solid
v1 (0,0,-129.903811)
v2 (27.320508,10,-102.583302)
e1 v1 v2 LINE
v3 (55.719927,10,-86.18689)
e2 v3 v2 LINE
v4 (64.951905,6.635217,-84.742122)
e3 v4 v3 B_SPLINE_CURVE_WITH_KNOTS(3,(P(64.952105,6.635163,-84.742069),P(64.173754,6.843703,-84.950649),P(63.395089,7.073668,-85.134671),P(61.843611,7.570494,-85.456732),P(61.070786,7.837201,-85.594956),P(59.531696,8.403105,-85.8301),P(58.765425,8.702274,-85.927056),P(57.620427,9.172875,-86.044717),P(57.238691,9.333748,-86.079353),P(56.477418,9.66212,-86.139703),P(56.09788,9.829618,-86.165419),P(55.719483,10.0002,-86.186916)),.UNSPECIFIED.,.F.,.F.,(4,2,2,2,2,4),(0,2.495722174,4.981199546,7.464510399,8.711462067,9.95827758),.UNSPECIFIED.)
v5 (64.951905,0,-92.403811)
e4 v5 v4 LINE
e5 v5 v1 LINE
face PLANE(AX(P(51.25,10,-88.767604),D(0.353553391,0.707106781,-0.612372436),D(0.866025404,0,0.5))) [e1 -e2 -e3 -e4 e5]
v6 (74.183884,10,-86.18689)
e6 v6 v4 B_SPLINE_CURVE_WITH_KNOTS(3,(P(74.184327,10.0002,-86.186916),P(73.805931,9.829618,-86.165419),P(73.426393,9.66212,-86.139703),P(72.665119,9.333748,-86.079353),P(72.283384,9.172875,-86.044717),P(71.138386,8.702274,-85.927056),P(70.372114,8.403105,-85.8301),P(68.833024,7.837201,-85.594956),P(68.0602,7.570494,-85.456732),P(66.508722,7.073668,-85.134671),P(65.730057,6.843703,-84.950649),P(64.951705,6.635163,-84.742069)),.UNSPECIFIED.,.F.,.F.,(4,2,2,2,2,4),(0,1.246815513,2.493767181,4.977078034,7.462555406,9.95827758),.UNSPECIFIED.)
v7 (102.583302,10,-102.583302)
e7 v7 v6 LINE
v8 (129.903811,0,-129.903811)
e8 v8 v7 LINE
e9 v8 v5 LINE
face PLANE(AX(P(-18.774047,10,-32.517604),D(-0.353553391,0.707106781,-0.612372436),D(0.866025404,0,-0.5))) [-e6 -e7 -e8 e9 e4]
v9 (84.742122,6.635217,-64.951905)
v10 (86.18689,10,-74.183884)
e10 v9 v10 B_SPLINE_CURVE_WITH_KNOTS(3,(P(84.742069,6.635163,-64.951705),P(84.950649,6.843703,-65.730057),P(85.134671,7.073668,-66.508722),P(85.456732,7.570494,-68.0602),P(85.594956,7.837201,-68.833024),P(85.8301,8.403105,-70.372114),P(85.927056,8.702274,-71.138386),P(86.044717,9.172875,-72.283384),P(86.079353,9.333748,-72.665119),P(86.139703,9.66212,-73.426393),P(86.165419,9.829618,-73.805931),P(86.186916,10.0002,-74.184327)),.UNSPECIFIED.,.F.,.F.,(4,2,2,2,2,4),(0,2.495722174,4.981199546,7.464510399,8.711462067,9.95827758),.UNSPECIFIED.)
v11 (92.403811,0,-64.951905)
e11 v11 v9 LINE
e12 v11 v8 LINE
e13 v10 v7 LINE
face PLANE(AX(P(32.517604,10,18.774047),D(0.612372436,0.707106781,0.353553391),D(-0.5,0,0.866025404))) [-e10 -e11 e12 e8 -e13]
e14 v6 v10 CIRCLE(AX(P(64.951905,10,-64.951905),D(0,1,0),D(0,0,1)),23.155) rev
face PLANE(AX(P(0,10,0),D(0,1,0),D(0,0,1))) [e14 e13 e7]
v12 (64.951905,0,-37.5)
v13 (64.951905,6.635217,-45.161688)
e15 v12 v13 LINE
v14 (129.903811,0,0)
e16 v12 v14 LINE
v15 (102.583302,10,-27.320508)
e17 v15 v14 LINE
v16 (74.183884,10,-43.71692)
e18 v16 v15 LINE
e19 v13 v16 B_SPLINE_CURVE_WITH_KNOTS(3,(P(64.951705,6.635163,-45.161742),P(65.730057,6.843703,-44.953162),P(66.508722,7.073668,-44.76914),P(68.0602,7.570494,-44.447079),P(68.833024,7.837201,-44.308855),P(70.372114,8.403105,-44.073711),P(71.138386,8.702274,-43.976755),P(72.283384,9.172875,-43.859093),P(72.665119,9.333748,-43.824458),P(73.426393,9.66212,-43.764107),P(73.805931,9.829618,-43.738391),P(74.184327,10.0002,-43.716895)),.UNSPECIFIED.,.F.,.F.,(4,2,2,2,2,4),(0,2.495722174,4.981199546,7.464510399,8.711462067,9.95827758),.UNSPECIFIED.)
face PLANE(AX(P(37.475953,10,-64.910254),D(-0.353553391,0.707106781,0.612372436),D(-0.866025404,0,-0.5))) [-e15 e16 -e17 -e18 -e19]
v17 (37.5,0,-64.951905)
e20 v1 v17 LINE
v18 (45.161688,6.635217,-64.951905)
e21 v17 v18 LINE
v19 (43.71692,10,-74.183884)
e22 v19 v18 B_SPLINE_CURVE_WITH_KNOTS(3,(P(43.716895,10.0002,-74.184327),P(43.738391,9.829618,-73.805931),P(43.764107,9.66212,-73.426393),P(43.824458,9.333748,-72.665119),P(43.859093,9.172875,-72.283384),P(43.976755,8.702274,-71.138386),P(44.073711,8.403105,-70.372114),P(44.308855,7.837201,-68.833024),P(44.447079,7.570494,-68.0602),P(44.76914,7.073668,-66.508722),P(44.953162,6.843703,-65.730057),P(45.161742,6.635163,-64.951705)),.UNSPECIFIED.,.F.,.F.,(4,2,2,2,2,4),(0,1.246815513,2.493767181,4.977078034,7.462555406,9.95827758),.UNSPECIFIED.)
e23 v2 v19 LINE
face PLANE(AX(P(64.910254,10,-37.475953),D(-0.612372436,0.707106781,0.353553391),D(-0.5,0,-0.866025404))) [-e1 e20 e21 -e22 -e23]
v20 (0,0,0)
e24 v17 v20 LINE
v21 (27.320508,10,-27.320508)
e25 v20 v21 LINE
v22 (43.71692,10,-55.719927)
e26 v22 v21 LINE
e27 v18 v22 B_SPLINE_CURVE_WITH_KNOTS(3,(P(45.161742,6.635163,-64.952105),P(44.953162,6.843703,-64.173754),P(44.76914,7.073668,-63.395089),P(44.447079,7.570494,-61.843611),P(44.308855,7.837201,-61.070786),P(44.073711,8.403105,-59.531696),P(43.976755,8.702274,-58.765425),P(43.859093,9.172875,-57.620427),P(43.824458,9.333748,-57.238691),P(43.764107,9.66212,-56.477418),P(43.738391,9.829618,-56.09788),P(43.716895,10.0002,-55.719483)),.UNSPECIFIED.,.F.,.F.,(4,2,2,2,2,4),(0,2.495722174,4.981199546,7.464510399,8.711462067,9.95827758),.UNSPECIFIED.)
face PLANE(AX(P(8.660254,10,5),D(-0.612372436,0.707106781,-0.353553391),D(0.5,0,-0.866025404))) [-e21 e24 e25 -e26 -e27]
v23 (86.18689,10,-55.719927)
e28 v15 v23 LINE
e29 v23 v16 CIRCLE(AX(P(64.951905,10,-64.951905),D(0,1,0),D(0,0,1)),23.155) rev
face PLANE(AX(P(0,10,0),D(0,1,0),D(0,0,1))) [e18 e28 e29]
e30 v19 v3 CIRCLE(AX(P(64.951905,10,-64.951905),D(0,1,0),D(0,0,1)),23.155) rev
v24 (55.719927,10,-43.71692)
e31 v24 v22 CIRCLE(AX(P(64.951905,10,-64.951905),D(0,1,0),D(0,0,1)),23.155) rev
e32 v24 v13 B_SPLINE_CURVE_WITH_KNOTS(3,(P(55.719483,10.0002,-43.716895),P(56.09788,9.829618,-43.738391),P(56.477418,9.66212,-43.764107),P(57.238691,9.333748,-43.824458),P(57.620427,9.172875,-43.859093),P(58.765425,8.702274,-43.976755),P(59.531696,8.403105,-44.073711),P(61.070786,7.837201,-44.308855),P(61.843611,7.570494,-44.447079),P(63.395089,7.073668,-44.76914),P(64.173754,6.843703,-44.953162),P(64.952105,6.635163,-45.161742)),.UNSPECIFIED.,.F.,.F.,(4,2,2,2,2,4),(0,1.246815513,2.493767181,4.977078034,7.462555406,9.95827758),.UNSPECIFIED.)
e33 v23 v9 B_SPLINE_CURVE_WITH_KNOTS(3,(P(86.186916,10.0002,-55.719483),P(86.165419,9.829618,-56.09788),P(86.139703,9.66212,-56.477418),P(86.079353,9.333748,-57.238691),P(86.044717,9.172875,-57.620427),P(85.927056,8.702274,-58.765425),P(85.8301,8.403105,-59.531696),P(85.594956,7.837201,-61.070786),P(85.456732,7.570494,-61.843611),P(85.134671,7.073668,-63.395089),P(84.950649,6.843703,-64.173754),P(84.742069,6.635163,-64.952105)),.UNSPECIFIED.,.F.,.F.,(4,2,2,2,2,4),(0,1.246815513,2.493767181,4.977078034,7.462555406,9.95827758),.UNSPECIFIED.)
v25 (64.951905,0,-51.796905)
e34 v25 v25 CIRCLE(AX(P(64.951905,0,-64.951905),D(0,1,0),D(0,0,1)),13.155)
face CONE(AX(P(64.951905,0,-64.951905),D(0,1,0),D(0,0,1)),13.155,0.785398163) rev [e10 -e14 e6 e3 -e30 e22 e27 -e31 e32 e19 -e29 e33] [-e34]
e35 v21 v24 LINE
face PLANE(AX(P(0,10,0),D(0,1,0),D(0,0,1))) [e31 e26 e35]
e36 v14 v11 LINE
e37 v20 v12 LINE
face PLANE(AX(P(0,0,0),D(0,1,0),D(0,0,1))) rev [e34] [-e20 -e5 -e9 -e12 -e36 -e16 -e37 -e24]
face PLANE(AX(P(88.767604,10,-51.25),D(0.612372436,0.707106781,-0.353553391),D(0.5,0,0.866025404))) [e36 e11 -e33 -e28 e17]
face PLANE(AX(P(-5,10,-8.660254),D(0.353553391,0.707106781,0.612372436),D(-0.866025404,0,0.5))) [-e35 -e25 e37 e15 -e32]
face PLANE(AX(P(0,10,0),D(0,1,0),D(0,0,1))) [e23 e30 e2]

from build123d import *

# Parameters (mm, degrees)
SKETCH1_R           = 13.155
BOSS_EXTRUDE1_DEPTH = 10
CHAMFER4_SIZE       = 10


with BuildPart() as part:
    # Sketch1 → Boss-Extrude1 (new body)
    with BuildSketch(Plane(origin=(0, 0, 0), x_dir=(1, 0, 0), z_dir=(0, 1, 0))):
        Polygon((0, 0), (37.5, 64.951905284), (0, 129.903810568), (64.951905284, 92.403810568), (129.903810568, 129.903810568), (92.403810568, 64.951905284), (129.903810568, 0), (64.951905284, 37.5), align=None)
        with Locations(Location((64.951905284, 64.951905284, 0), (0, 0, 270))):
            Circle(SKETCH1_R, mode=Mode.SUBTRACT)
    extrude(amount=BOSS_EXTRUDE1_DEPTH)

    # Chamfer4
    # the kernel refuses this chamfer: 10 mm, written as the material it takes off along each edge
    with BuildSketch(Plane(origin=(64.951905284, 10, -64.951905284), x_dir=(0, 0, 1), z_dir=(-1, 0, 0))) as chamfer4_piece_1:
        Polygon((13.155, -CHAMFER4_SIZE), (13.155 + CHAMFER4_SIZE, 0), (13.155, 0), align=None)
    revolve(axis=Axis((64.951905284, 10, -64.951905284), (0, 1, 0)), mode=Mode.SUBTRACT)
    with BuildSketch(Plane(origin=(-12.85841494, 10, 22.271427981), x_dir=(-0.023812127644090117, -0.9996219169112968, -0.013747938305293196), z_dir=(0.5000000000000011, 0, -0.866025403784438))) as chamfer4_piece_2_section:
        Polygon((CHAMFER4_SIZE * 0.999621916911, -CHAMFER4_SIZE * 0.0274958766106), (-CHAMFER4_SIZE * 0.0274958766106, -CHAMFER4_SIZE * 0.999621916911), (0, 0), align=None)
    chamfer4_piece_2 = extrude(amount=126.433659759, mode=Mode.PRIVATE)
    chamfer4_piece_2 = split(chamfer4_piece_2, bisect_by=Plane(origin=(51.736915966, 6.682227924, -40.292843487), z_dir=(-0.8660254037844383, 0, 0.5000000000000009)), keep=Keep.TOP, mode=Mode.PRIVATE)
    add(chamfer4_piece_2, mode=Mode.SUBTRACT)
    with BuildSketch(Plane(origin=(50.35841494, 10, -42.680477303), x_dir=(-0.02381212764408977, -0.9996219169112968, 0.013747938305292988), z_dir=(-0.5000000000000009, 0, -0.8660254037844383))) as chamfer4_piece_3_section:
        Polygon((CHAMFER4_SIZE * 0.999621916911, -CHAMFER4_SIZE * 0.0274958766106), (-CHAMFER4_SIZE * 0.0274958766106, -CHAMFER4_SIZE * 0.999621916911), (0, 0), align=None)
    chamfer4_piece_3 = extrude(amount=126.433659759, mode=Mode.PRIVATE)
    chamfer4_piece_3 = split(chamfer4_piece_3, bisect_by=Plane(origin=(51.736915966, 6.682227924, -89.610967081), z_dir=(-0.866025403784438, 0, -0.5000000000000011)), keep=Keep.TOP, mode=Mode.PRIVATE)
    add(chamfer4_piece_3, mode=Mode.SUBTRACT)
    with BuildSketch(Plane(origin=(-22.271427981, 10, -142.762225507), x_dir=(0.01374793830529321, -0.9996219169112968, -0.023812127644090134), z_dir=(0.866025403784438, 0, 0.5000000000000012))) as chamfer4_piece_4_section:
        Polygon((CHAMFER4_SIZE * 0.999621916911, -CHAMFER4_SIZE * 0.0274958766106), (-CHAMFER4_SIZE * 0.0274958766106, -CHAMFER4_SIZE * 0.999621916911), (0, 0), align=None)
    chamfer4_piece_4 = extrude(amount=126.433659759, mode=Mode.PRIVATE)
    chamfer4_piece_4 = split(chamfer4_piece_4, bisect_by=Plane(origin=(40.292843487, 6.682227924, -78.166894601), z_dir=(-0.5000000000000012, 0, -0.866025403784438)), keep=Keep.TOP, mode=Mode.PRIVATE)
    add(chamfer4_piece_4, mode=Mode.SUBTRACT)
    with BuildSketch(Plane(origin=(42.680477303, 10, -79.545395628), x_dir=(-0.01374793830529287, -0.9996219169112968, -0.023812127644089548), z_dir=(0.866025403784438, 0, -0.5000000000000012))) as chamfer4_piece_5_section:
        Polygon((CHAMFER4_SIZE * 0.999621916911, -CHAMFER4_SIZE * 0.0274958766106), (-CHAMFER4_SIZE * 0.0274958766106, -CHAMFER4_SIZE * 0.999621916911), (0, 0), align=None)
    chamfer4_piece_5 = extrude(amount=126.433659759, mode=Mode.PRIVATE)
    chamfer4_piece_5 = split(chamfer4_piece_5, bisect_by=Plane(origin=(89.610967081, 6.682227924, -78.166894601), z_dir=(0.5000000000000012, 0, -0.866025403784438)), keep=Keep.TOP, mode=Mode.PRIVATE)
    add(chamfer4_piece_5, mode=Mode.SUBTRACT)
    with BuildSketch(Plane(origin=(142.762225507, 10, -152.175238548), x_dir=(0.023812127644092358, -0.9996219169112965, 0.013747938305294477), z_dir=(-0.5000000000000007, 0, 0.8660254037844384))) as chamfer4_piece_6_section:
        Polygon((CHAMFER4_SIZE * 0.999621916911, -CHAMFER4_SIZE * 0.0274958766106), (-CHAMFER4_SIZE * 0.0274958766106, -CHAMFER4_SIZE * 0.999621916911), (0, 0), align=None)
    chamfer4_piece_6 = extrude(amount=126.433659759, mode=Mode.PRIVATE)
    chamfer4_piece_6 = split(chamfer4_piece_6, bisect_by=Plane(origin=(78.166894601, 6.682227924, -89.610967081), z_dir=(0.8660254037844382, 0, -0.500000000000001)), keep=Keep.TOP, mode=Mode.PRIVATE)
    add(chamfer4_piece_6, mode=Mode.SUBTRACT)
    with BuildSketch(Plane(origin=(79.545395628, 10, -87.223333264), x_dir=(0.023812127644090287, -0.9996219169112968, -0.013747938305293292), z_dir=(0.500000000000001, 0, 0.8660254037844382))) as chamfer4_piece_7_section:
        Polygon((CHAMFER4_SIZE * 0.999621916911, -CHAMFER4_SIZE * 0.0274958766106), (-CHAMFER4_SIZE * 0.0274958766106, -CHAMFER4_SIZE * 0.999621916911), (0, 0), align=None)
    chamfer4_piece_7 = extrude(amount=126.433659759, mode=Mode.PRIVATE)
    chamfer4_piece_7 = split(chamfer4_piece_7, bisect_by=Plane(origin=(78.166894601, 6.682227924, -40.292843487), z_dir=(0.8660254037844384, 0, 0.5000000000000007)), keep=Keep.TOP, mode=Mode.PRIVATE)
    add(chamfer4_piece_7, mode=Mode.SUBTRACT)
    with BuildSketch(Plane(origin=(152.175238548, 10, 12.85841494), x_dir=(-0.013747938305293, -0.9996219169112968, 0.023812127644089767), z_dir=(-0.8660254037844379, 0, -0.5000000000000012))) as chamfer4_piece_8_section:
        Polygon((CHAMFER4_SIZE * 0.999621916911, -CHAMFER4_SIZE * 0.0274958766106), (-CHAMFER4_SIZE * 0.0274958766106, -CHAMFER4_SIZE * 0.999621916911), (0, 0), align=None)
    chamfer4_piece_8 = extrude(amount=126.433659759, mode=Mode.PRIVATE)
    chamfer4_piece_8 = split(chamfer4_piece_8, bisect_by=Plane(origin=(89.610967081, 6.682227924, -51.736915966), z_dir=(0.5000000000000012, 0, 0.8660254037844379)), keep=Keep.TOP, mode=Mode.PRIVATE)
    add(chamfer4_piece_8, mode=Mode.SUBTRACT)
    with BuildSketch(Plane(origin=(87.223333264, 10, -50.35841494), x_dir=(0.013747938305293599, -0.9996219169112968, 0.0238121276440908), z_dir=(-0.8660254037844379, 0, 0.5000000000000012))) as chamfer4_piece_9_section:
        Polygon((CHAMFER4_SIZE * 0.999621916911, -CHAMFER4_SIZE * 0.0274958766106), (-CHAMFER4_SIZE * 0.0274958766106, -CHAMFER4_SIZE * 0.999621916911), (0, 0), align=None)
    chamfer4_piece_9 = extrude(amount=126.433659759, mode=Mode.PRIVATE)
    chamfer4_piece_9 = split(chamfer4_piece_9, bisect_by=Plane(origin=(40.292843487, 6.682227924, -51.736915966), z_dir=(-0.5000000000000012, 0, 0.8660254037844379)), keep=Keep.TOP, mode=Mode.PRIVATE)
    add(chamfer4_piece_9, mode=Mode.SUBTRACT)
    with BuildSketch(Plane(origin=(-12.85841494, 10, 22.271427981), x_dir=(-0.023812127644090117, -0.9996219169112968, -0.013747938305293196), z_dir=(0.5000000000000011, 0, -0.866025403784438))) as chamfer4_piece_10a_section:
        Polygon((CHAMFER4_SIZE * 0.999621916911, -CHAMFER4_SIZE * 0.0274958766106), (-CHAMFER4_SIZE * 0.0274958766106, -CHAMFER4_SIZE * 0.999621916911), (0, 0), align=None)
    chamfer4_piece_10a = extrude(amount=126.433659759, mode=Mode.PRIVATE)
    chamfer4_piece_10a = split(chamfer4_piece_10a, bisect_by=Plane(origin=(36.018509, 6.773025627, -67.517922967), z_dir=(0.8660254037844383, 0, -0.5000000000000009)), keep=Keep.TOP, mode=Mode.PRIVATE)
    with BuildSketch(Plane(origin=(50.35841494, 10, -42.680477303), x_dir=(-0.02381212764408977, -0.9996219169112968, 0.013747938305292988), z_dir=(-0.5000000000000009, 0, -0.8660254037844383))) as chamfer4_piece_10b_section:
        Polygon((CHAMFER4_SIZE * 0.999621916911, -CHAMFER4_SIZE * 0.0274958766106), (-CHAMFER4_SIZE * 0.0274958766106, -CHAMFER4_SIZE * 0.999621916911), (0, 0), align=None)
    chamfer4_piece_10b = extrude(amount=126.433659759, mode=Mode.PRIVATE)
    chamfer4_piece_10b = split(chamfer4_piece_10b, bisect_by=Plane(origin=(36.018509, 6.773025627, -62.385887601), z_dir=(0.866025403784438, 0, 0.5000000000000011)), keep=Keep.TOP, mode=Mode.PRIVATE)
    chamfer4_piece_10 = chamfer4_piece_10a & chamfer4_piece_10b
    add(chamfer4_piece_10, mode=Mode.SUBTRACT)
    with BuildSketch(Plane(origin=(-22.271427981, 10, -142.762225507), x_dir=(0.01374793830529321, -0.9996219169112968, -0.023812127644090134), z_dir=(0.866025403784438, 0, 0.5000000000000012))) as chamfer4_piece_11a_section:
        Polygon((CHAMFER4_SIZE * 0.999621916911, -CHAMFER4_SIZE * 0.0274958766106), (-CHAMFER4_SIZE * 0.0274958766106, -CHAMFER4_SIZE * 0.999621916911), (0, 0), align=None)
    chamfer4_piece_11a = extrude(amount=126.433659759, mode=Mode.PRIVATE)
    chamfer4_piece_11a = split(chamfer4_piece_11a, bisect_by=Plane(origin=(67.517922967, 6.773025627, -93.885301568), z_dir=(0.5000000000000012, 0, 0.866025403784438)), keep=Keep.TOP, mode=Mode.PRIVATE)
    with BuildSketch(Plane(origin=(42.680477303, 10, -79.545395628), x_dir=(-0.01374793830529287, -0.9996219169112968, -0.023812127644089548), z_dir=(0.866025403784438, 0, -0.5000000000000012))) as chamfer4_piece_11b_section:
        Polygon((CHAMFER4_SIZE * 0.999621916911, -CHAMFER4_SIZE * 0.0274958766106), (-CHAMFER4_SIZE * 0.0274958766106, -CHAMFER4_SIZE * 0.999621916911), (0, 0), align=None)
    chamfer4_piece_11b = extrude(amount=126.433659759, mode=Mode.PRIVATE)
    chamfer4_piece_11b = split(chamfer4_piece_11b, bisect_by=Plane(origin=(62.385887601, 6.773025627, -93.885301568), z_dir=(-0.5000000000000012, 0, 0.866025403784438)), keep=Keep.TOP, mode=Mode.PRIVATE)
    chamfer4_piece_11 = chamfer4_piece_11a & chamfer4_piece_11b
    add(chamfer4_piece_11, mode=Mode.SUBTRACT)
    with BuildSketch(Plane(origin=(142.762225507, 10, -152.175238548), x_dir=(0.023812127644092358, -0.9996219169112965, 0.013747938305294477), z_dir=(-0.5000000000000007, 0, 0.8660254037844384))) as chamfer4_piece_12a_section:
        Polygon((CHAMFER4_SIZE * 0.999621916911, -CHAMFER4_SIZE * 0.0274958766106), (-CHAMFER4_SIZE * 0.0274958766106, -CHAMFER4_SIZE * 0.999621916911), (0, 0), align=None)
    chamfer4_piece_12a = extrude(amount=126.433659759, mode=Mode.PRIVATE)
    chamfer4_piece_12a = split(chamfer4_piece_12a, bisect_by=Plane(origin=(93.885301568, 6.773025627, -62.385887601), z_dir=(-0.8660254037844382, 0, 0.500000000000001)), keep=Keep.TOP, mode=Mode.PRIVATE)
    with BuildSketch(Plane(origin=(79.545395628, 10, -87.223333264), x_dir=(0.023812127644090287, -0.9996219169112968, -0.013747938305293292), z_dir=(0.500000000000001, 0, 0.8660254037844382))) as chamfer4_piece_12b_section:
        Polygon((CHAMFER4_SIZE * 0.999621916911, -CHAMFER4_SIZE * 0.0274958766106), (-CHAMFER4_SIZE * 0.0274958766106, -CHAMFER4_SIZE * 0.999621916911), (0, 0), align=None)
    chamfer4_piece_12b = extrude(amount=126.433659759, mode=Mode.PRIVATE)
    chamfer4_piece_12b = split(chamfer4_piece_12b, bisect_by=Plane(origin=(93.885301568, 6.773025627, -67.517922967), z_dir=(-0.8660254037844384, 0, -0.5000000000000007)), keep=Keep.TOP, mode=Mode.PRIVATE)
    chamfer4_piece_12 = chamfer4_piece_12a & chamfer4_piece_12b
    add(chamfer4_piece_12, mode=Mode.SUBTRACT)
    with BuildSketch(Plane(origin=(152.175238548, 10, 12.85841494), x_dir=(-0.013747938305293, -0.9996219169112968, 0.023812127644089767), z_dir=(-0.8660254037844379, 0, -0.5000000000000012))) as chamfer4_piece_13a_section:
        Polygon((CHAMFER4_SIZE * 0.999621916911, -CHAMFER4_SIZE * 0.0274958766106), (-CHAMFER4_SIZE * 0.0274958766106, -CHAMFER4_SIZE * 0.999621916911), (0, 0), align=None)
    chamfer4_piece_13a = extrude(amount=126.433659759, mode=Mode.PRIVATE)
    chamfer4_piece_13a = split(chamfer4_piece_13a, bisect_by=Plane(origin=(62.385887601, 6.773025627, -36.018509), z_dir=(-0.5000000000000012, 0, -0.8660254037844379)), keep=Keep.TOP, mode=Mode.PRIVATE)
    with BuildSketch(Plane(origin=(87.223333264, 10, -50.35841494), x_dir=(0.013747938305293599, -0.9996219169112968, 0.0238121276440908), z_dir=(-0.8660254037844379, 0, 0.5000000000000012))) as chamfer4_piece_13b_section:
        Polygon((CHAMFER4_SIZE * 0.999621916911, -CHAMFER4_SIZE * 0.0274958766106), (-CHAMFER4_SIZE * 0.0274958766106, -CHAMFER4_SIZE * 0.999621916911), (0, 0), align=None)
    chamfer4_piece_13b = extrude(amount=126.433659759, mode=Mode.PRIVATE)
    chamfer4_piece_13b = split(chamfer4_piece_13b, bisect_by=Plane(origin=(67.517922967, 6.773025627, -36.018509), z_dir=(0.5000000000000012, 0, -0.8660254037844379)), keep=Keep.TOP, mode=Mode.PRIVATE)
    chamfer4_piece_13 = chamfer4_piece_13a & chamfer4_piece_13b
    add(chamfer4_piece_13, mode=Mode.SUBTRACT)


solid = part.part
